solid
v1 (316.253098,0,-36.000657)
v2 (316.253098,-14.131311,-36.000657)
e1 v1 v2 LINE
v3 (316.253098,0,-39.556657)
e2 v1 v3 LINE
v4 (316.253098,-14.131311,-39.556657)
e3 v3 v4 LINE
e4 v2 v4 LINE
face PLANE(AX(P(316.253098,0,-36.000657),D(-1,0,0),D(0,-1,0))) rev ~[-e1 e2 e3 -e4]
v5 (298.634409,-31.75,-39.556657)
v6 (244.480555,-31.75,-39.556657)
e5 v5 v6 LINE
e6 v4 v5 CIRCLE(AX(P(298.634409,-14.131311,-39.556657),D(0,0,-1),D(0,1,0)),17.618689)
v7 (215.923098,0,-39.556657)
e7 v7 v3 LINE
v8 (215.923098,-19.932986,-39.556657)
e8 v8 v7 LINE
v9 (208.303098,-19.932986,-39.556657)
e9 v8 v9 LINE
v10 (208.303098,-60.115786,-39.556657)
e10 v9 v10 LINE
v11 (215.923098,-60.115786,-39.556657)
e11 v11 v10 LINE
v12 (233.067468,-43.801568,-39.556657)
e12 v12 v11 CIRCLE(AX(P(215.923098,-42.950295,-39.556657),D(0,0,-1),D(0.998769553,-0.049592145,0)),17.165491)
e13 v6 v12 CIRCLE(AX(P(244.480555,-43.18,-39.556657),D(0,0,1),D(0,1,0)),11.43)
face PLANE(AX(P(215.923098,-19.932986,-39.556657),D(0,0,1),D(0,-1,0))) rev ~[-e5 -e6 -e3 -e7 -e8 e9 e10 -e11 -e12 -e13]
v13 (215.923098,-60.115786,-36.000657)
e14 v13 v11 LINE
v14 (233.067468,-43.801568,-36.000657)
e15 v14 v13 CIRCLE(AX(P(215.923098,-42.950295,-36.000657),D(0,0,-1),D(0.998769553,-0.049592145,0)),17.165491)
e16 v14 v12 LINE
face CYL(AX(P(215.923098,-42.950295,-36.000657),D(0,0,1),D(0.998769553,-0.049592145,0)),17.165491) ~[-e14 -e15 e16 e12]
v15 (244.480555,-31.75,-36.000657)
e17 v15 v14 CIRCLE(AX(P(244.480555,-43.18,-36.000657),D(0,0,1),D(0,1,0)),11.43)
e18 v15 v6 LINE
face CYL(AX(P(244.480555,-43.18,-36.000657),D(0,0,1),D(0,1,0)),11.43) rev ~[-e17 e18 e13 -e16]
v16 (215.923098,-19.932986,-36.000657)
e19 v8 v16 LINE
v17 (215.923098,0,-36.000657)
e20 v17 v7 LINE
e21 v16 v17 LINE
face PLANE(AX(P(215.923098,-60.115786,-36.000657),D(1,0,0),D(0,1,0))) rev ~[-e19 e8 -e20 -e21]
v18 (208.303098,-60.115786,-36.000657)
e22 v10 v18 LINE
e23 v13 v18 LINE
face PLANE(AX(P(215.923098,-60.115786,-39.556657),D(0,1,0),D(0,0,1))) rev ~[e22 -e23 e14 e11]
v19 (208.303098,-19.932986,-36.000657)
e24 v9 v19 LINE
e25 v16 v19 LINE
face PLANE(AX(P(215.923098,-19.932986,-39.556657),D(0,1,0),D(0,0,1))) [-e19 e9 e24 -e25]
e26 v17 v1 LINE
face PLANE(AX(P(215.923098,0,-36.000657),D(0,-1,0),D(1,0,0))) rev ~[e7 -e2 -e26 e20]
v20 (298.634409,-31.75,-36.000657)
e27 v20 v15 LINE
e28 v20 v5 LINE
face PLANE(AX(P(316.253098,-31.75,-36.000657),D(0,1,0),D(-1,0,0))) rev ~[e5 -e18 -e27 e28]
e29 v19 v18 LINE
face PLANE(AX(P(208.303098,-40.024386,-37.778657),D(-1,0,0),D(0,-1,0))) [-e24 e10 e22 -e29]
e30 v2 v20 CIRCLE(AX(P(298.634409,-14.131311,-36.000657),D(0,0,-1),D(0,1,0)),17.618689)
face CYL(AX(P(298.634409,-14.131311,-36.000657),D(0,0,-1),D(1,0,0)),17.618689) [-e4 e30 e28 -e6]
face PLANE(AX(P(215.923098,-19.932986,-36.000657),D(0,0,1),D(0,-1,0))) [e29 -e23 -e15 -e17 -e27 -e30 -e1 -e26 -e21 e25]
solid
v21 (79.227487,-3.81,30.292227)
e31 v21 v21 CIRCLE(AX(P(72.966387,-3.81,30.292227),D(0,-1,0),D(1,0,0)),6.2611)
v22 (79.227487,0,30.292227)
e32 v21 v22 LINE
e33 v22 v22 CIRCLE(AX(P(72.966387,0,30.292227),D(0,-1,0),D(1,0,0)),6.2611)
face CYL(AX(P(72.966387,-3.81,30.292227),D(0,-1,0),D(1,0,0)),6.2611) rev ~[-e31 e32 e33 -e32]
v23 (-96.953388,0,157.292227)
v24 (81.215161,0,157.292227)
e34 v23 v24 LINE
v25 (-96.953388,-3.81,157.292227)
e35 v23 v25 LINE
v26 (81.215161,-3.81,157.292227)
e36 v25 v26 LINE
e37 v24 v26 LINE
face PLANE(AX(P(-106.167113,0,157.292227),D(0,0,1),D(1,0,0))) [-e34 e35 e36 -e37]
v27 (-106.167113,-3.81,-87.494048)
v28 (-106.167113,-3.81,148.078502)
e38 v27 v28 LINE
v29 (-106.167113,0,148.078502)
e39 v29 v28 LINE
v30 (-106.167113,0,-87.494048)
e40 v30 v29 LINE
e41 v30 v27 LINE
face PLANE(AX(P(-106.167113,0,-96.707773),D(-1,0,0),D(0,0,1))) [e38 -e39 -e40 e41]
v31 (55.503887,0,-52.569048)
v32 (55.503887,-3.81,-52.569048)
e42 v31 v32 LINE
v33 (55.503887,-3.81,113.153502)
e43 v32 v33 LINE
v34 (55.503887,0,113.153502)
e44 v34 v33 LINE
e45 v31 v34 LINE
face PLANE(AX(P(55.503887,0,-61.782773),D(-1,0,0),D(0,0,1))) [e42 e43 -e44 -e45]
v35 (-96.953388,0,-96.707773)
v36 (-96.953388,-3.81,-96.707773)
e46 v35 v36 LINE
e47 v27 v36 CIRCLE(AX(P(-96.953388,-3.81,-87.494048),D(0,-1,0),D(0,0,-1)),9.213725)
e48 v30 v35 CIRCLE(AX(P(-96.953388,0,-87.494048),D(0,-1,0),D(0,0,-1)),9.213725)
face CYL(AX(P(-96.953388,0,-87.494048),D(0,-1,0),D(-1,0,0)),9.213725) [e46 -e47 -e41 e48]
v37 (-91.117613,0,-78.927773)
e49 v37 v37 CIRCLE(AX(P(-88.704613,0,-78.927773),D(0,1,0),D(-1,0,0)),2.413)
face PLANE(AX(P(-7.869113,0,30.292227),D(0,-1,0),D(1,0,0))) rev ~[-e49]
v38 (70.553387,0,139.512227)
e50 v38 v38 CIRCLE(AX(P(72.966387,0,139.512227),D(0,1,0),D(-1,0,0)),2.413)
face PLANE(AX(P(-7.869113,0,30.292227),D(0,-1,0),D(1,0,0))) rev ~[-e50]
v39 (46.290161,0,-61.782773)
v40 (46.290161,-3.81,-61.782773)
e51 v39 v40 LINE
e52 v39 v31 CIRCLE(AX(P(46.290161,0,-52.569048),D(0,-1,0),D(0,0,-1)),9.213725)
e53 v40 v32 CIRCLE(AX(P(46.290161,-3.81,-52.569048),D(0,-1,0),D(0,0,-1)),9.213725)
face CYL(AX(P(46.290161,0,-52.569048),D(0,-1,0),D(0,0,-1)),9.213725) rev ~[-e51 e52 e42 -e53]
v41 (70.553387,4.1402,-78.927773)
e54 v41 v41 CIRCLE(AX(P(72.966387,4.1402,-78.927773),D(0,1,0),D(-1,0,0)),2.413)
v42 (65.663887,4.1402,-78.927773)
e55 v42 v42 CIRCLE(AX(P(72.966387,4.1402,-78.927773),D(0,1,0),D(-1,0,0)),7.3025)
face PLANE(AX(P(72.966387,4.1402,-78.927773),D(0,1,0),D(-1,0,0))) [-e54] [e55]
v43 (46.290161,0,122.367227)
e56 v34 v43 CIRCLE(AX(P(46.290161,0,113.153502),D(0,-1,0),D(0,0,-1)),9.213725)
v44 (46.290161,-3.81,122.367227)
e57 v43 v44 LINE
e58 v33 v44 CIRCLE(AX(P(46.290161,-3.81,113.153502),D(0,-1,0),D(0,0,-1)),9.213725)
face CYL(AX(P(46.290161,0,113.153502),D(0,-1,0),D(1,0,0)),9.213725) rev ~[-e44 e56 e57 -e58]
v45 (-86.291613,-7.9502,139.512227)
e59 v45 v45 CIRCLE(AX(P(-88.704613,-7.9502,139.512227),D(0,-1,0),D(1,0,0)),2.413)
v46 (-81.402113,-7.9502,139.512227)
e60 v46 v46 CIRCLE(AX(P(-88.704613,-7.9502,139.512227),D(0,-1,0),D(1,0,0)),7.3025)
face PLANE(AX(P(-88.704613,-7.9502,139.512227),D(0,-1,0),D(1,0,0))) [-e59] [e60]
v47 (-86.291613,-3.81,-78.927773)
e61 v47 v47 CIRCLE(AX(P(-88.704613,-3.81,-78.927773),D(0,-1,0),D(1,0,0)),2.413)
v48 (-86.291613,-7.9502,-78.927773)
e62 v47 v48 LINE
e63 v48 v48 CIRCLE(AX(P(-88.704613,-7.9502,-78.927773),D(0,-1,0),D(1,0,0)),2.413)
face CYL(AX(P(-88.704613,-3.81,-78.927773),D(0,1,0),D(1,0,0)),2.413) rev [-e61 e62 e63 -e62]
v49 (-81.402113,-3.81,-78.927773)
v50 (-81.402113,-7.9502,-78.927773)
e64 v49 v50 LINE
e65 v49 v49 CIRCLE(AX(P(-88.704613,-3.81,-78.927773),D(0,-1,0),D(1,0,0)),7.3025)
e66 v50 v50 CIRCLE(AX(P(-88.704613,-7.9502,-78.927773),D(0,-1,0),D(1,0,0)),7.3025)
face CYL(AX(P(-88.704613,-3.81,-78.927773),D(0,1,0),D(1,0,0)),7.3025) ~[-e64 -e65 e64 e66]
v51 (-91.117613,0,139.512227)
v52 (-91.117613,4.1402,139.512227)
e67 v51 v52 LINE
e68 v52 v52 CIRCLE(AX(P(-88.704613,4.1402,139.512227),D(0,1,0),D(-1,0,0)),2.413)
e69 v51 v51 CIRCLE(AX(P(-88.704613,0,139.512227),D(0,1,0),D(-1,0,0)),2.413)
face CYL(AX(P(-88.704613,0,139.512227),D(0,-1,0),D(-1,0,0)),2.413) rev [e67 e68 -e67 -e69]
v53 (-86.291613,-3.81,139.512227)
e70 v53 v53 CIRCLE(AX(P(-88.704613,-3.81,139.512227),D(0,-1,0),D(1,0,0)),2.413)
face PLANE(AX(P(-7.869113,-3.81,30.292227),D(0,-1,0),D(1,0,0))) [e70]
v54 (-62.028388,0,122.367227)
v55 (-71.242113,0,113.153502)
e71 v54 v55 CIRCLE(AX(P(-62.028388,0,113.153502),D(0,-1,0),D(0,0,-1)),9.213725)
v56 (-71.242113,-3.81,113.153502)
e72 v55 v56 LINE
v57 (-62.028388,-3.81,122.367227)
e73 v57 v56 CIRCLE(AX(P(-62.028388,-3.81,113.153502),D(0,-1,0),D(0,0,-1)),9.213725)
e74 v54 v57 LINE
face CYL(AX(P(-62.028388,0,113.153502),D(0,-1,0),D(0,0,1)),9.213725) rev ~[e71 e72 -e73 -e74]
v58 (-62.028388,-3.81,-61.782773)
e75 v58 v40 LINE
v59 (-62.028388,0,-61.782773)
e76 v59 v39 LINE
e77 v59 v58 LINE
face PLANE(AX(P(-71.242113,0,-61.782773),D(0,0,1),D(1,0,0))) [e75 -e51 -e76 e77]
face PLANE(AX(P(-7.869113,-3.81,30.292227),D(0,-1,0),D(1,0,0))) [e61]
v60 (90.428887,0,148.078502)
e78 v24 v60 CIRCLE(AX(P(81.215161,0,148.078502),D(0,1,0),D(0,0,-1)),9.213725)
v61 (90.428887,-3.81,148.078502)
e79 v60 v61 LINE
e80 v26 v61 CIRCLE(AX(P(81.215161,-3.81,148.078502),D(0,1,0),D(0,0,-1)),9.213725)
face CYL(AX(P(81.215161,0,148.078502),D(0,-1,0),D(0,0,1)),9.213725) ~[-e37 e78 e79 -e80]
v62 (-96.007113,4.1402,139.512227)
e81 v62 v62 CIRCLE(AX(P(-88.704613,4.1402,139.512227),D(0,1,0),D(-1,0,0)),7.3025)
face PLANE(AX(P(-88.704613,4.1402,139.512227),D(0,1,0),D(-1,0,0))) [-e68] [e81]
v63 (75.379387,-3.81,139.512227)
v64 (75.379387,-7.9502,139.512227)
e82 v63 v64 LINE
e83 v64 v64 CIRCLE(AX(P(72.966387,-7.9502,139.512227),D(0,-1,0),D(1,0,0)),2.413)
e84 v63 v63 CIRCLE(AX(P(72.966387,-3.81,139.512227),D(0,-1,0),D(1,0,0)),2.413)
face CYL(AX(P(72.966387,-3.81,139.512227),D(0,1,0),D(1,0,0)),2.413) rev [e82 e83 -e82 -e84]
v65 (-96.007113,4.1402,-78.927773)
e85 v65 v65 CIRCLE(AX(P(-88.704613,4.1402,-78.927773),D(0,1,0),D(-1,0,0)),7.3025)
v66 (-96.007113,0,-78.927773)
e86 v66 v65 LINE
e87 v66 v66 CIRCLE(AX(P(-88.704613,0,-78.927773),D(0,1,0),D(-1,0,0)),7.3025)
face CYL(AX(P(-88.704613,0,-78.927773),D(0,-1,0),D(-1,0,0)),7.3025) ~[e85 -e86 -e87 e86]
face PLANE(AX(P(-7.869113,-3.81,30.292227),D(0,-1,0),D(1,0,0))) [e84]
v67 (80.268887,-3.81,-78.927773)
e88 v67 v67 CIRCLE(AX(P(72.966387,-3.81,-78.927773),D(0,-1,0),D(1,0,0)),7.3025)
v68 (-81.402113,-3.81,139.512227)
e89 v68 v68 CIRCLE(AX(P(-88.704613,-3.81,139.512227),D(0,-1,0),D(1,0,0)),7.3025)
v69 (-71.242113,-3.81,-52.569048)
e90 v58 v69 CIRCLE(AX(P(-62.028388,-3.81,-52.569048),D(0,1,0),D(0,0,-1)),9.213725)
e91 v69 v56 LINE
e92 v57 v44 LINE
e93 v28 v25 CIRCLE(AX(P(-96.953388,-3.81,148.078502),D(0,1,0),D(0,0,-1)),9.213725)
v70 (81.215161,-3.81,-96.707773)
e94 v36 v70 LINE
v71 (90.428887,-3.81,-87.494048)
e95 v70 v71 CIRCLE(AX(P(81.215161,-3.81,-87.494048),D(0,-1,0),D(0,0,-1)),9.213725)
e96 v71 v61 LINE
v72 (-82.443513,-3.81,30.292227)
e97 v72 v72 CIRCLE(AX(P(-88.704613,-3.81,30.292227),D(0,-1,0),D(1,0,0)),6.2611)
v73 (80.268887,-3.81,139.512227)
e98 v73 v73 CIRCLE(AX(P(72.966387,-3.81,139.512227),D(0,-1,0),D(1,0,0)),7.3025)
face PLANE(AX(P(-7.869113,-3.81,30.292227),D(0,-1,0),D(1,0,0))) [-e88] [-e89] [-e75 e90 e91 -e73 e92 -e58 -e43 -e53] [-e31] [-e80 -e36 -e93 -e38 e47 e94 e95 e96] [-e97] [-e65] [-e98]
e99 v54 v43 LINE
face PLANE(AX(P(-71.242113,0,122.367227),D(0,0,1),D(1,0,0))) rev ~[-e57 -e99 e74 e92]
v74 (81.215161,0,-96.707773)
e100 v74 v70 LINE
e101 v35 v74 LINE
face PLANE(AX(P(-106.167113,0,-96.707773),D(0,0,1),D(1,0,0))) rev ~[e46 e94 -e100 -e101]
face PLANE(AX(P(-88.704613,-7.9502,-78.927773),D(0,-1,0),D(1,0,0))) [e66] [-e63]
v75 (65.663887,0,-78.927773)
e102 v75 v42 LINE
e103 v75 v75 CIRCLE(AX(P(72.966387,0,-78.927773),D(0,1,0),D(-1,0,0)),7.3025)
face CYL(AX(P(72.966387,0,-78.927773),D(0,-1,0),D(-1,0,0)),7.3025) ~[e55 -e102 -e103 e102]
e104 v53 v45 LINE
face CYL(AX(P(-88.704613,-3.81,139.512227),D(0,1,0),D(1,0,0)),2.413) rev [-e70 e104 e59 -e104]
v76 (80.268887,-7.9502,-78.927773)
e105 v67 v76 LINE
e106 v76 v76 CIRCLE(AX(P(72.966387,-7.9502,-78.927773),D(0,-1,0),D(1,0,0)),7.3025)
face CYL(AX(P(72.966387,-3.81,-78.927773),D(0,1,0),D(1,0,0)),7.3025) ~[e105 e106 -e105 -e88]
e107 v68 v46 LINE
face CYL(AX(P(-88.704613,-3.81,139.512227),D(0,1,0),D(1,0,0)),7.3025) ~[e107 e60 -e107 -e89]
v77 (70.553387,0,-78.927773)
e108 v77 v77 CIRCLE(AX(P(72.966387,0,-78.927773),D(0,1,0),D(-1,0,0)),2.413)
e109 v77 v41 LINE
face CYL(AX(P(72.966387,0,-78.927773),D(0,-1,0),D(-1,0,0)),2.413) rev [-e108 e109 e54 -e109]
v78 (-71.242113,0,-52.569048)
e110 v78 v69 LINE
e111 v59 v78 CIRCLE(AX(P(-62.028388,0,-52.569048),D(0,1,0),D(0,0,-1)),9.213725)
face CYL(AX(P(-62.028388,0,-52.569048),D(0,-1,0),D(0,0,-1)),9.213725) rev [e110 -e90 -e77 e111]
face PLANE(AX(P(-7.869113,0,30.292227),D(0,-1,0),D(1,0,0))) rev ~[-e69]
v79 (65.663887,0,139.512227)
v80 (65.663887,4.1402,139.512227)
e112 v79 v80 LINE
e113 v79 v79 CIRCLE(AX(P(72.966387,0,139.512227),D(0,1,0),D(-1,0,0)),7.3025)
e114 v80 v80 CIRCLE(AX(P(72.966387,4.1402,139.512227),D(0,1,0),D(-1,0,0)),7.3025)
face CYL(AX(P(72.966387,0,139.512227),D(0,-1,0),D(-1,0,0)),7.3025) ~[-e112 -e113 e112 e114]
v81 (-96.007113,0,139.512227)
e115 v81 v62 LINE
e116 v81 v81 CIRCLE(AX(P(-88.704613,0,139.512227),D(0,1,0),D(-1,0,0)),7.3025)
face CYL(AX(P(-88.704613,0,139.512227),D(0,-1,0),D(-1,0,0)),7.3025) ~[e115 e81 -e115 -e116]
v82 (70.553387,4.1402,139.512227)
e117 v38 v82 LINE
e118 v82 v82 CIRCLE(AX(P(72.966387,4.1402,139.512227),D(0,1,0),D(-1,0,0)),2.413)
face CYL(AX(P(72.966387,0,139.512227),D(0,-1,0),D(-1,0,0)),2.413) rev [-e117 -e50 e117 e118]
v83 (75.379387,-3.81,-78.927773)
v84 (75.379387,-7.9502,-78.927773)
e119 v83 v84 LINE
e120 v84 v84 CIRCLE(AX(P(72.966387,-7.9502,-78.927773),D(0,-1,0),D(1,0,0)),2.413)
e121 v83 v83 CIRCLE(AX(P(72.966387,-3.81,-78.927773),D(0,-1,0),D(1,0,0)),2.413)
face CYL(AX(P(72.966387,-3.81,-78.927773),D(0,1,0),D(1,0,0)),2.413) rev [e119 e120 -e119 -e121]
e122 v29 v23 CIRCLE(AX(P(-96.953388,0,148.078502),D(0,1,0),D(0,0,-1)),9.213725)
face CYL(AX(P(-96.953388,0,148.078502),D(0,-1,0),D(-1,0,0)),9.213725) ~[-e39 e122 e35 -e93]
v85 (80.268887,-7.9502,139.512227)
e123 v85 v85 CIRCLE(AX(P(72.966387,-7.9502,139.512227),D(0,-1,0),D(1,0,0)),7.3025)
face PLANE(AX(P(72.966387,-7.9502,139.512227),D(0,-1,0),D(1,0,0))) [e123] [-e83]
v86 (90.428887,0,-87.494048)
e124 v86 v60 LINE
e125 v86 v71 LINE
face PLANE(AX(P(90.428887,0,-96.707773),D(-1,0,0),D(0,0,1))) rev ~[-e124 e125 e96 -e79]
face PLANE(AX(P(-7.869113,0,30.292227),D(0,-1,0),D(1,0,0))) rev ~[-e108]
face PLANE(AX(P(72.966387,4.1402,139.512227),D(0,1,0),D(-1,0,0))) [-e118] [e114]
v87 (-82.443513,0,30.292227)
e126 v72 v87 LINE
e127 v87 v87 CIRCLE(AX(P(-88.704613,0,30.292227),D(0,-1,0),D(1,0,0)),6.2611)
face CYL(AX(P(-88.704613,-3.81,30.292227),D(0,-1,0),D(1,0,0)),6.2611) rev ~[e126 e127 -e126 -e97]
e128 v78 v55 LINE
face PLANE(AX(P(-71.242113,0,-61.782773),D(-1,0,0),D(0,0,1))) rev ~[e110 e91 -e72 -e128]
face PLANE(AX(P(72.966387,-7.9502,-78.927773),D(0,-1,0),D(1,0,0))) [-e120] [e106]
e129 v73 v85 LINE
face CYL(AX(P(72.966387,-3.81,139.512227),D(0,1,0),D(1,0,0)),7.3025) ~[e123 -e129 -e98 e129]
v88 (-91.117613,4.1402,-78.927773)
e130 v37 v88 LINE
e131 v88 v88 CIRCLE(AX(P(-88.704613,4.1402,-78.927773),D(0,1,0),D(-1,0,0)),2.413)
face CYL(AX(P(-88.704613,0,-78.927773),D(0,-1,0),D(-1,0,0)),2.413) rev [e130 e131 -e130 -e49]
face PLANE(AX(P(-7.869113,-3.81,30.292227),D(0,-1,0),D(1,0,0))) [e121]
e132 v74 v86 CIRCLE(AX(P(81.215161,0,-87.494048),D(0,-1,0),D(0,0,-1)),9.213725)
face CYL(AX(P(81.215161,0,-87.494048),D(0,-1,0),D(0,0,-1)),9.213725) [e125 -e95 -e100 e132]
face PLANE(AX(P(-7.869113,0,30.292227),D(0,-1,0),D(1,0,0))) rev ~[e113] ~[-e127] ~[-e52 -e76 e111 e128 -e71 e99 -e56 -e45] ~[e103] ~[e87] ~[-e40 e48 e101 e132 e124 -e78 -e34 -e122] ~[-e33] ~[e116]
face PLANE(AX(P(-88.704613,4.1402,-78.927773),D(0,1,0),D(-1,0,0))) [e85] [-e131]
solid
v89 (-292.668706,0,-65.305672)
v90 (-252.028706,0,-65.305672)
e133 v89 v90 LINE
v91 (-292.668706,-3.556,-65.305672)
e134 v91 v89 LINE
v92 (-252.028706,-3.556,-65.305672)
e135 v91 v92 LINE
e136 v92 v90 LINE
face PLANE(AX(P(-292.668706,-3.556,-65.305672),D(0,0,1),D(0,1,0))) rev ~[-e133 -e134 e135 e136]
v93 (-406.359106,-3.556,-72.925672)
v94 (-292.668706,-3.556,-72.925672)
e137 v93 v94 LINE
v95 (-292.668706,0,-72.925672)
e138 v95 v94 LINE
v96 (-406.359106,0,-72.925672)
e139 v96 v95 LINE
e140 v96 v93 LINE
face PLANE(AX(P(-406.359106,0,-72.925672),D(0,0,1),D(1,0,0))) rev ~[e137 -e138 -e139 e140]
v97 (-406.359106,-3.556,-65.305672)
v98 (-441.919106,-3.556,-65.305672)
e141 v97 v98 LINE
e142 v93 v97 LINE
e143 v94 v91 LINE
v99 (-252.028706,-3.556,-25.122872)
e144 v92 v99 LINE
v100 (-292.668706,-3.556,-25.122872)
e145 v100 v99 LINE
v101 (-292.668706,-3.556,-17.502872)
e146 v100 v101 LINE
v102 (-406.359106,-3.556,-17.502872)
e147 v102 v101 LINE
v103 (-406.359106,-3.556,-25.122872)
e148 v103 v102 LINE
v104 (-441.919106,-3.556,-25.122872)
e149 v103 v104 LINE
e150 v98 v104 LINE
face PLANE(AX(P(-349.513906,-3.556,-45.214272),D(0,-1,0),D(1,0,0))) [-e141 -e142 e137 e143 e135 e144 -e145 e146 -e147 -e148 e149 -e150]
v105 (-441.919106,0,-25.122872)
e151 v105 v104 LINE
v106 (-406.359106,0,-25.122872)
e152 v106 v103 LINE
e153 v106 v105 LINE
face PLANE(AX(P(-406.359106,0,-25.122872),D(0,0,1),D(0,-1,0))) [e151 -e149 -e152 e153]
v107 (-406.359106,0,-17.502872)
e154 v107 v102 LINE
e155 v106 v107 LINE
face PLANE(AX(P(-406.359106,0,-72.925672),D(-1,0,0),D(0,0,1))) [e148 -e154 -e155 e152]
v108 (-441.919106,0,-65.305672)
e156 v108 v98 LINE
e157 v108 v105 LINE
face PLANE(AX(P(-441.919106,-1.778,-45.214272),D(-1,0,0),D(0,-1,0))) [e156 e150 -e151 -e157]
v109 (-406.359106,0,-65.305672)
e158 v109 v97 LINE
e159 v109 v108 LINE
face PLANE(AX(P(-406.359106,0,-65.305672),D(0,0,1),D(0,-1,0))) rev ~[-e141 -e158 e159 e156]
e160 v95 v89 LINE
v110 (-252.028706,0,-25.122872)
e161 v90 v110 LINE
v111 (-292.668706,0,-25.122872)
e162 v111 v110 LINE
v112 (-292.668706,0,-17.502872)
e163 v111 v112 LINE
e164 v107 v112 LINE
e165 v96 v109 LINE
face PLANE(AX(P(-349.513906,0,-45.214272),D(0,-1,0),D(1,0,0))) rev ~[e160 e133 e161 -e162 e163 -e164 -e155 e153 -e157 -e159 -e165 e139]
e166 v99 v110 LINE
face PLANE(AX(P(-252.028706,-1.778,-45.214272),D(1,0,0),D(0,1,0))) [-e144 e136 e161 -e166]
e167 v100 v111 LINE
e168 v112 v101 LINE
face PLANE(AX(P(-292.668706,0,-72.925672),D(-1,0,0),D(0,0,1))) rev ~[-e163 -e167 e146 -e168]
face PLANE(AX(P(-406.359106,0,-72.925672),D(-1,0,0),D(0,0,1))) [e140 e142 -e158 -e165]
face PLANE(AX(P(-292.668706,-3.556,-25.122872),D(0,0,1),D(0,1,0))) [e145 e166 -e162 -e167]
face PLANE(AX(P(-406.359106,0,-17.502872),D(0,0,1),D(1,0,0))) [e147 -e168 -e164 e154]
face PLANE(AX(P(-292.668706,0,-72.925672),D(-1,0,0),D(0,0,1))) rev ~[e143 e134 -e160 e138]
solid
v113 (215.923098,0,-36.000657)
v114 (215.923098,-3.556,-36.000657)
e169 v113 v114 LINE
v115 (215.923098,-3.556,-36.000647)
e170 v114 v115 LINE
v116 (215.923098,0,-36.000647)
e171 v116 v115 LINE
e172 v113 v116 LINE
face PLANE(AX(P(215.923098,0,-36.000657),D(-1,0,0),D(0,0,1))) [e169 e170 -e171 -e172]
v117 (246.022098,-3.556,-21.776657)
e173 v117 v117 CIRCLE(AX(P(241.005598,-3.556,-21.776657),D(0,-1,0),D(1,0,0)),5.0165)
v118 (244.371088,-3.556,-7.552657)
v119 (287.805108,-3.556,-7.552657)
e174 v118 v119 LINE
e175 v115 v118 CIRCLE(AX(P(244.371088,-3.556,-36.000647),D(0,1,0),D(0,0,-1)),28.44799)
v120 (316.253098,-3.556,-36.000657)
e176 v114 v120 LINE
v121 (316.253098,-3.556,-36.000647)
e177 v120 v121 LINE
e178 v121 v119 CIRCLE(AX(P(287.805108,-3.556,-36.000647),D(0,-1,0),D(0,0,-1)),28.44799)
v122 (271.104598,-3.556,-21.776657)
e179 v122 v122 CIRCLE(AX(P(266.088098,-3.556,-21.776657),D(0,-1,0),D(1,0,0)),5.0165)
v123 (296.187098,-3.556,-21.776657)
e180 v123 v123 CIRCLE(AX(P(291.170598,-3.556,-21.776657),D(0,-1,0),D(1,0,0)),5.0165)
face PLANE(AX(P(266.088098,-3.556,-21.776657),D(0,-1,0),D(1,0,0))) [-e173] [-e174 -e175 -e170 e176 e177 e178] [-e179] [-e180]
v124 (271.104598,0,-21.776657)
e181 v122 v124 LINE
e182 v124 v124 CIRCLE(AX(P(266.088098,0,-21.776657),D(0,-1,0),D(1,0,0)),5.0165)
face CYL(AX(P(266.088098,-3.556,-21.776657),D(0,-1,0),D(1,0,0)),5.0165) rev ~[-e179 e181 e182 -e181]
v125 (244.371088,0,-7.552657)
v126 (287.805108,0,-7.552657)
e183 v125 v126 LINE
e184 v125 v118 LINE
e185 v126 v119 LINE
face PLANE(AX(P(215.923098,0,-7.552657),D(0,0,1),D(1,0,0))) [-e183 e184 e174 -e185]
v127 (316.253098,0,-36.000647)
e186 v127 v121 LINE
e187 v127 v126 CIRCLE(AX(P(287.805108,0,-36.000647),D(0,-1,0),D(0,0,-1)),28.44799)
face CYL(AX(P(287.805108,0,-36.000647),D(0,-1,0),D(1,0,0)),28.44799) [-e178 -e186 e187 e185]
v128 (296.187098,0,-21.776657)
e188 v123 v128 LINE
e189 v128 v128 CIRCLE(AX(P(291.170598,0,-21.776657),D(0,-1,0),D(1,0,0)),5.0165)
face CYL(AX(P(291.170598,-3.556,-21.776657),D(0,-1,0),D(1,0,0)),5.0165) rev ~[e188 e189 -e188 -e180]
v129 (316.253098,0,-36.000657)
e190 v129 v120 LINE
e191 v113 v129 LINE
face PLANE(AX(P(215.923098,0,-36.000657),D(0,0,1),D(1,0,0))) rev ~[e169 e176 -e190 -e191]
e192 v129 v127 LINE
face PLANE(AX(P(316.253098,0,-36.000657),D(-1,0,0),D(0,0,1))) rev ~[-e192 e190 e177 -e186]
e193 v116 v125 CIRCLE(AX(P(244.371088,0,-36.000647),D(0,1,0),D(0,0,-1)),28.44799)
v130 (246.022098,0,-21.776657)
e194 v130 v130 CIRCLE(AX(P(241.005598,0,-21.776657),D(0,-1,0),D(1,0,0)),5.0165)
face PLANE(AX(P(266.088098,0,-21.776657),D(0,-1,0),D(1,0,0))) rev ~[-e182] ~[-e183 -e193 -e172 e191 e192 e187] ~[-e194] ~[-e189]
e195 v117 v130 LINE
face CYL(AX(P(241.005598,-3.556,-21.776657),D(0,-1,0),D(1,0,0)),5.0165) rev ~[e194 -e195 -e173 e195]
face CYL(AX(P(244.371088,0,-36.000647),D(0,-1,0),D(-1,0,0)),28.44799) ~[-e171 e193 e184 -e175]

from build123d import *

# Parameters (mm, degrees)
F0_W      = 196.596
F0_H      = 254
F0_W_2    = 126.746
F0_H_2    = 184.15
F1_DEPTH  = 3.81
F2_R      = 9.2137253501
F3_R      = 6.2611
F4_DEPTH  = 3.81
F5_W      = 113.6904
F5_H      = 55.4228
F6_DEPTH  = 3.556
F7_W      = 100.33
F7_H      = 28.448
F8_DEPTH  = 3.556
F9_R      = 28.44799
F10_R     = 5.0165
F11_DEPTH = 3.556
F12_W     = 3.556
F12_H     = 40.1828
F13_DEPTH = 35.56
F14_W     = 3.556
F14_H     = 40.1828
F15_DEPTH = 40.64
F16_R     = 7.3025
F16_R_2   = 2.413
F17_DEPTH = 4.1402
F18_R     = 7.3025
F18_R_2   = 2.413
F19_DEPTH = 4.1402
F21_DEPTH = 3.556
F22_W     = 40.1828
F22_H     = 3.556
F23_DEPTH = 7.62
F24_R     = 17.6186891568


# Not quite as in the source:
# - a fillet or chamfer is up to 0.001 mm smaller than in the source, because OpenCascade refuses the exact size


with BuildPart() as f1:
    # F0 (on Front) → F1 (new body)
    with BuildSketch(Plane.XZ):
        with Locations((-7.8691132367, 30.2922270442)):
            Rectangle(F0_W, F0_H)
        with Locations((-7.8691132367, 30.2922270442)):
            Rectangle(F0_W_2, F0_H_2, mode=Mode.SUBTRACT)
    extrude(amount=F1_DEPTH)

    # F2
    f2_edges = [f1.edges().sort_by_distance(p)[0] for p in [
        (-106.167113, -1.905, 157.292227),
        (90.428887, -1.905, 157.292227),
        (90.428887, -1.905, -96.707773),
        (-106.167113, -1.905, -96.707773),
        (-71.242113, -1.905, -61.782773),
        (55.503887, -1.905, -61.782773),
        (55.503887, -1.905, 122.367227),
        (-71.242113, -1.905, 122.367227),
    ]]
    fillet(f2_edges, radius=F2_R)

    # F3 (on face) → F4 (cut, through all)
    with BuildSketch(Plane.XZ.offset(3.81)):
        with Locations((-88.7046132367, 30.2922270442)):
            Circle(F3_R)
        with Locations((72.9663867633, 30.2922270442)):
            Circle(F3_R)
    extrude(amount=-F4_DEPTH, mode=Mode.SUBTRACT)

    # F16 (on face) → F17 (join)
    with BuildSketch(Plane(origin=(0, 0, 0), x_dir=(-1, 0, 0), z_dir=(0, 1, 0))):
        with Locations((-72.9663867633, 139.5122270442)):
            Circle(F16_R)
        with Locations((-72.9663867633, 139.5122270442)):
            Circle(F16_R_2, mode=Mode.SUBTRACT)
        with Locations((88.7046132367, 139.5122270442)):
            Circle(F16_R)
        with Locations((88.7046132367, 139.5122270442)):
            Circle(F16_R_2, mode=Mode.SUBTRACT)
        with Locations((88.7046132367, -78.9277729558)):
            Circle(F16_R)
        with Locations((88.7046132367, -78.9277729558)):
            Circle(F16_R_2, mode=Mode.SUBTRACT)
        with Locations((-72.9663867633, -78.9277729558)):
            Circle(F16_R)
        with Locations((-72.9663867633, -78.9277729558)):
            Circle(F16_R_2, mode=Mode.SUBTRACT)
    extrude(amount=F17_DEPTH)

    # F18 (on face) → F19 (join)
    with BuildSketch(Plane.XZ.offset(3.81)):
        with Locations((72.9663867633, 139.5122270442)):
            Circle(F18_R)
        with Locations((72.9663867633, 139.5122270442)):
            Circle(F18_R_2, mode=Mode.SUBTRACT)
        with Locations((-88.7046132367, 139.5122270442)):
            Circle(F18_R)
        with Locations((-88.7046132367, 139.5122270442)):
            Circle(F18_R_2, mode=Mode.SUBTRACT)
        with Locations((-88.7046132367, -78.9277729558)):
            Circle(F18_R)
        with Locations((-88.7046132367, -78.9277729558)):
            Circle(F18_R_2, mode=Mode.SUBTRACT)
        with Locations((72.9663867633, -78.9277729558)):
            Circle(F18_R)
        with Locations((72.9663867633, -78.9277729558)):
            Circle(F18_R_2, mode=Mode.SUBTRACT)
    extrude(amount=F19_DEPTH)


with BuildPart() as f6:
    # F5 (on Front) → F6 (new body)
    with BuildSketch(Plane.XZ):
        with Locations((-349.5139063023, -45.2142719351)):
            Rectangle(F5_W, F5_H)
    extrude(amount=F6_DEPTH)

    # F12 (on face) → F13 (join)
    with BuildSketch(Plane(origin=(-406.3591063023, 0, 0), x_dir=(0, -1, 0), z_dir=(-1, 0, 0))):
        with Locations((1.778, -45.2142719351)):
            Rectangle(F12_W, F12_H)
    extrude(amount=F13_DEPTH)

    # F14 (on face) → F15 (join)
    with BuildSketch(Plane.YZ.offset(-292.6687063023)):
        with Locations((-1.778, -45.2142719351)):
            Rectangle(F14_W, F14_H)
    extrude(amount=F15_DEPTH)


with BuildPart() as f8:
    # F7 (on Front) → F8 (new body)
    with BuildSketch(Plane.XZ):
        with Locations((266.0880976948, -21.7766570859)):
            Rectangle(F7_W, F7_H)
    extrude(amount=F8_DEPTH)

    # F9 (radius 28.448 in the source; OpenCascade refuses exactly that, so slightly less here)
    f9_edges = [f8.edges().sort_by_distance(p)[0] for p in [
        (215.923098, -1.778, -7.552657),
        (316.253098, -1.778, -7.552657),
    ]]
    fillet(f9_edges, radius=F9_R)

    # F10 (on face) → F11 (cut, through all)
    with BuildSketch(Plane.XZ.offset(3.556)):
        with Locations((266.0880976948, -21.7766570859)):
            Circle(F10_R)
        with Locations((291.1705976948, -21.7766570859)):
            Circle(F10_R)
        with Locations((241.0055976948, -21.7766570859)):
            Circle(F10_R)
    extrude(amount=-F11_DEPTH, mode=Mode.SUBTRACT)


with BuildPart() as f21:
    # F20 (on face) → F21 (new body)
    with BuildSketch(Plane(origin=(0, 0, -36.0006570859), x_dir=(1, 0, 0), z_dir=(0, 0, -1))):
        with BuildLine():
            Line((215.9230976948, 0), (316.2530976948, 0))
            Line((316.2530976948, 0), (316.2530976948, 31.75))
            Line((316.2530976948, 31.75), (244.4805547121, 31.75))
            ThreePointArc((244.4805547121, 31.75), (236.1814756256, 35.3205988576), (233.0674678087, 43.8015684485))
            ThreePointArc((233.0674678087, 43.8015684485), (227.7561354432, 55.3854592004), (215.9230976948, 60.1157862604))
            Line((215.9230976948, 60.1157862604), (215.9230976948, 0))
        make_face()
    extrude(amount=F21_DEPTH)

    # F22 (on face) → F23 (join)
    with BuildSketch(Plane(origin=(215.9230976948, 0, 0), x_dir=(0, -1, 0), z_dir=(-1, 0, 0))):
        with Locations((40.0243862604, -37.7786570859)):
            Rectangle(F22_W, F22_H)
    extrude(amount=F23_DEPTH)

    # F24
    f24_edges = [f21.edges().sort_by_distance(p)[0] for p in [
        (316.253098, -31.75, -37.778657),
    ]]
    fillet(f24_edges, radius=F24_R)


solid = Compound([f1.part, f6.part, f8.part, f21.part])
